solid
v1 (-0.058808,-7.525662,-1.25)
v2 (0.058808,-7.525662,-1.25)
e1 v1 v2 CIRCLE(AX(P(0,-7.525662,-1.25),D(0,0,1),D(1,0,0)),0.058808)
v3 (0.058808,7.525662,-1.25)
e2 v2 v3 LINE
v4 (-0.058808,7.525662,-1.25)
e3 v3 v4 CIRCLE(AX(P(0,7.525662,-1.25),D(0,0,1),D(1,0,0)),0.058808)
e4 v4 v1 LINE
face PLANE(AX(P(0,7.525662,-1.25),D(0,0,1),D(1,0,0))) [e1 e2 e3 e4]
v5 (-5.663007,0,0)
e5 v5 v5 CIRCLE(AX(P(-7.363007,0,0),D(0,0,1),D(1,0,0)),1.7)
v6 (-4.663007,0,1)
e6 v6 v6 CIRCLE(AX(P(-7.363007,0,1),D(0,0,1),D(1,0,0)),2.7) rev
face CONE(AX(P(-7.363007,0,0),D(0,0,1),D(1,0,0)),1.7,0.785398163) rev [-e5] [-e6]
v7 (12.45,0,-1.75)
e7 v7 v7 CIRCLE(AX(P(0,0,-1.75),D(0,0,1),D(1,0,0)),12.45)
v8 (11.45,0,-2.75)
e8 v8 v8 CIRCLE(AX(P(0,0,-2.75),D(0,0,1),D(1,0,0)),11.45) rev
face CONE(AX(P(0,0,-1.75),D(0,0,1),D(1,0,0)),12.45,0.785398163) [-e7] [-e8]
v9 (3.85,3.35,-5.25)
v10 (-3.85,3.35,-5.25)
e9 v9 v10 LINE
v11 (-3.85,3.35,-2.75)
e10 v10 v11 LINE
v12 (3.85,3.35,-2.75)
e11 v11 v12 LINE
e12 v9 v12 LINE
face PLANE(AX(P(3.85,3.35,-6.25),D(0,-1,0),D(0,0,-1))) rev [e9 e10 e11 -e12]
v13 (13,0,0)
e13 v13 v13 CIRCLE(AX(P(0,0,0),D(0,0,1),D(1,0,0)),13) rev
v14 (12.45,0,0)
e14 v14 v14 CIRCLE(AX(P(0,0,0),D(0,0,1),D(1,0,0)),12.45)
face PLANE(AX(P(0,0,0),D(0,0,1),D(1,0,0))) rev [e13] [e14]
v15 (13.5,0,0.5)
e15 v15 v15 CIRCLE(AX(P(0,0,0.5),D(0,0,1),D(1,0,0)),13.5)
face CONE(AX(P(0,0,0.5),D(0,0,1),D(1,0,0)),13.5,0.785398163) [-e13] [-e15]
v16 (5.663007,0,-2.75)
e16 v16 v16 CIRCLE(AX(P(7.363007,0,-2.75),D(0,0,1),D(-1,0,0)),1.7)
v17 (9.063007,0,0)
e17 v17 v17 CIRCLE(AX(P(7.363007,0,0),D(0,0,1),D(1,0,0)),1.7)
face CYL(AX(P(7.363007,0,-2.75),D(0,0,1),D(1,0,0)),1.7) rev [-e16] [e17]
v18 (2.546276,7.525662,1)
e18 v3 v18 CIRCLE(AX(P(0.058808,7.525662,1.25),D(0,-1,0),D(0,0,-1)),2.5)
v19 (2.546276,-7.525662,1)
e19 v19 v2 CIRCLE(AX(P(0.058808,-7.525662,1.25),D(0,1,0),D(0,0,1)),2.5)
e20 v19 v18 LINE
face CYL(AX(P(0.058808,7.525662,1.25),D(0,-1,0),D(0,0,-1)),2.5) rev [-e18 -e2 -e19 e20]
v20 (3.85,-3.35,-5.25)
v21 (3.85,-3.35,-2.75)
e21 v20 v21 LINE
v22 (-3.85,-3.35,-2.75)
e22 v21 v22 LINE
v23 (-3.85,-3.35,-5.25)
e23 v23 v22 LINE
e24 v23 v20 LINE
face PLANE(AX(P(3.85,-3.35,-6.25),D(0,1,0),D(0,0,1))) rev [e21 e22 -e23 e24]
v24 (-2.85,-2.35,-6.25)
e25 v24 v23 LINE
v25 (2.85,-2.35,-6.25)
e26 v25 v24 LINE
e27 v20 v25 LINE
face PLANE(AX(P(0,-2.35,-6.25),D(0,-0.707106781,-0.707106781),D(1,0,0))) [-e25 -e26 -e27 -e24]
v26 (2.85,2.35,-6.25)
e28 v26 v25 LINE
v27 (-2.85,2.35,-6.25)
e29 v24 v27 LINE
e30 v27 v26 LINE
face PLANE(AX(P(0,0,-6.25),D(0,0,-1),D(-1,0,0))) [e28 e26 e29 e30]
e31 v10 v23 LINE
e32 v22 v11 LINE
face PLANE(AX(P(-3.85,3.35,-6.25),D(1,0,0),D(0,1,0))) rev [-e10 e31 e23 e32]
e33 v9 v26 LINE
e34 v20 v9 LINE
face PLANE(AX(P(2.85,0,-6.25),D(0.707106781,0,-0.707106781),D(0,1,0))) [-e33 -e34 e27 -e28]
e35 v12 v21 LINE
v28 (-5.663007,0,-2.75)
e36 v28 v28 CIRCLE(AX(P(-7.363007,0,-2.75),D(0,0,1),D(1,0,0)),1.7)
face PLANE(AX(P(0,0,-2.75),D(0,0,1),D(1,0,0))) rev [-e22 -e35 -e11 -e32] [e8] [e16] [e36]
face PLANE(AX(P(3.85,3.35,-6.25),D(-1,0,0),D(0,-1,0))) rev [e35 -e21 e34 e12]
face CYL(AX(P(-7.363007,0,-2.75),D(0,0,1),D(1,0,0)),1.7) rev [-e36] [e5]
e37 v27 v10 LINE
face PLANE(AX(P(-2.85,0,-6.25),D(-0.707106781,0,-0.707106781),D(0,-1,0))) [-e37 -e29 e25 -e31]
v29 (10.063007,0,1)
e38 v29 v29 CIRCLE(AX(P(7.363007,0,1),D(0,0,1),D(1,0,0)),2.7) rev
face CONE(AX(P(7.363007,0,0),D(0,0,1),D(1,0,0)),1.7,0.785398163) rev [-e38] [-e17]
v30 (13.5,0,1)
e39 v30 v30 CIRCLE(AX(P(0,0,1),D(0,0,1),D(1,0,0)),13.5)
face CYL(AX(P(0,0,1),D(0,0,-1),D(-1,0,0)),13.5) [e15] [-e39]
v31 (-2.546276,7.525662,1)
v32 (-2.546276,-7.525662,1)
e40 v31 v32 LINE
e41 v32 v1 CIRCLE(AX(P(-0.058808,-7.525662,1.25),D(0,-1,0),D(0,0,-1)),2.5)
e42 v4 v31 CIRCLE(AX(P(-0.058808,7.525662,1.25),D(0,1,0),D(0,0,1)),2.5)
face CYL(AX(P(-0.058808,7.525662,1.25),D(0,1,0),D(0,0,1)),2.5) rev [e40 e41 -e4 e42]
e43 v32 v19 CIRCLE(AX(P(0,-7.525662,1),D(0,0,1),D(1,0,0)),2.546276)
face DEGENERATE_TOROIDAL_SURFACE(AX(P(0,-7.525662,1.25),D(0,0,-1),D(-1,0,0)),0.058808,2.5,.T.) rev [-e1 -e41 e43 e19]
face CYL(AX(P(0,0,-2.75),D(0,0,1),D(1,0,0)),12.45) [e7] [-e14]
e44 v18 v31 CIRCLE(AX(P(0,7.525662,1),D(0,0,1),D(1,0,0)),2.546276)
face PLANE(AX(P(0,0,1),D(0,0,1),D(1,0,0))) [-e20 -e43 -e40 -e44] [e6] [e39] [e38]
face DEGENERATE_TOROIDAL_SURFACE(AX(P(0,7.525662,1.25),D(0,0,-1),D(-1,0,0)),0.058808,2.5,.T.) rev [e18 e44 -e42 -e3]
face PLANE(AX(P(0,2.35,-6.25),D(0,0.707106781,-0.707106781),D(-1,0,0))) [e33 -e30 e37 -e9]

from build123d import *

# Parameters (mm, degrees)
SKETCH1_R           = 12.45
SKETCH1_R_2         = 1.7
BOSS_EXTRUDE1_DEPTH = 2.75
SKETCH2_W           = 7.7
SKETCH2_H           = 6.7
BOSS_EXTRUDE2_DEPTH = 3.5
BOSS_EXTRUDE3_START = 1
SKETCH3_R           = 13.5
SKETCH3_R_2         = 1.7
BOSS_EXTRUDE3_DEPTH = 1
CHAMFER1_SIZE       = 1
CHAMFER2_SIZE       = 0.5
CUT_EXTRUDE1_DEPTH  = 2.25
FILLET1_R           = 2.5
CHAMFER3_SIZE       = 1


with BuildPart() as part:
    # Sketch1 → Boss-Extrude1 (new body)
    with BuildSketch(Plane.XY):
        Circle(SKETCH1_R)
        with Locations((-7.36300717, 0)):
            Circle(SKETCH1_R_2, mode=Mode.SUBTRACT)
        with Locations(Location((7.36300717, 0, 0), (0, 0, 180))):
            Circle(SKETCH1_R_2, mode=Mode.SUBTRACT)
    extrude(amount=-BOSS_EXTRUDE1_DEPTH)

    # Sketch2 → Boss-Extrude2 (add)
    with BuildSketch(Plane(origin=(0, 0, -2.75), x_dir=(-1, 0, 0), z_dir=(0, 0, -1))):
        Rectangle(SKETCH2_W, SKETCH2_H)
    extrude(amount=BOSS_EXTRUDE2_DEPTH)

    # Sketch3 → Boss-Extrude3 (add)
    with BuildSketch(Plane.XY.offset(BOSS_EXTRUDE3_START)):
        Circle(SKETCH3_R)
        with Locations((-7.36300717, 0)):
            Circle(SKETCH3_R_2, mode=Mode.SUBTRACT)
        with Locations((7.36300717, 0)):
            Circle(SKETCH3_R_2, mode=Mode.SUBTRACT)
    extrude(amount=-BOSS_EXTRUDE3_DEPTH)

    # Chamfer1
    chamfer1_edges = [part.edges().sort_by_distance(p)[0] for p in [
        (-3.85, 0, -6.25),
        (0, 3.35, -6.25),
        (3.85, 0, -6.25),
        (0, -3.35, -6.25),
        (-12.45, 0, -2.75),
    ]]
    chamfer(chamfer1_edges, length=CHAMFER1_SIZE)

    # Chamfer2
    chamfer2_edges = [part.edges().sort_by_distance(p)[0] for p in [
        (-13.5, 0, 0),
    ]]
    chamfer(chamfer2_edges, length=CHAMFER2_SIZE)

    # Sketch4 → Cut-Extrude1 (cut)
    with BuildSketch(Plane.XY.offset(1)):
        with BuildLine():
            Line((2.54627648, 7.525661596), (2.54627648, -7.525661596))
            ThreePointArc((2.54627648, -7.525661596), (0, -10.071938075), (-2.54627648, -7.525661596))
            Line((-2.54627648, -7.525661596), (-2.54627648, 7.525661596))
            ThreePointArc((-2.54627648, 7.525661596), (0, 10.071938075), (2.54627648, 7.525661596))
        make_face()
    extrude(amount=-CUT_EXTRUDE1_DEPTH, mode=Mode.SUBTRACT)

    # Fillet1
    # the kernel refuses this fillet: 2.5 mm, written as the material it adds along each edge
    with BuildSketch(Plane(origin=(-2.54627648, -7.525661596, -1.25), x_dir=(0, 0, 1), z_dir=(0, 1, 0)), Plane(origin=(2.54627648, 7.525661596, -1.25), x_dir=(0, 0, 1), z_dir=(0, -1, 0))) as fillet1_piece_1:
        with BuildLine():
            CenterArc((2.5, 2.487468593), FILLET1_R, 180, 84.260829523)
            Line((0, 2.487468593), (-0.05, 2.487468593))
            Line((-0.05, 2.487468593), (-0.05, 0))
            Line((-0.05, 0), (0, -0.05))
            ThreePointArc((0, -0.05), (1.125, -0.05), (2.245, -0.049749372))
            Line((2.245, -0.049749372), (2.25, 0))
        make_face()
    extrude(amount=15.051323191)
    with BuildSketch(Plane(origin=(0, 7.525661596, -1.25), x_dir=(-1, 0, 0), z_dir=(0, -1, 0))) as fillet1_piece_2:
        with BuildLine():
            CenterArc((0.058807887, -2.5), FILLET1_R, 5.739170477, 84.260829523)
            Line((0.058807887, 0), (0.058807887, 0.05))
            Line((0.058807887, 0.05), (2.54627648, 0.05))
            Line((2.54627648, 0.05), (2.59627648, 0))
            ThreePointArc((2.59627648, 0), (2.59627648, -1.125), (2.596025852, -2.245))
            Line((2.596025852, -2.245), (2.54627648, -2.25))
        make_face()
    revolve(axis=Axis((0, 7.525661596, -1.25), (0, 0, -1)), revolution_arc=180)
    with BuildSketch(Plane(origin=(0, -7.525661596, -1.25), x_dir=(1, 0, 0), z_dir=(0, 1, 0))) as fillet1_piece_3:
        with BuildLine():
            CenterArc((0.058807887, -2.5), FILLET1_R, 5.739170477, 84.260829523)
            Line((0.058807887, 0), (0.058807887, 0.05))
            Line((0.058807887, 0.05), (2.54627648, 0.05))
            Line((2.54627648, 0.05), (2.59627648, 0))
            ThreePointArc((2.59627648, 0), (2.59627648, -1.125), (2.596025852, -2.245))
            Line((2.596025852, -2.245), (2.54627648, -2.25))
        make_face()
    revolve(axis=Axis((0, -7.525661596, -1.25), (0, 0, -1)), revolution_arc=180)

    # Chamfer3
    # the kernel refuses this chamfer: 1 mm, written as the material it takes off along each edge
    with BuildSketch(Plane(origin=(-7.36300717, 0, 1), x_dir=(1, 0, 0), z_dir=(0, -1, 0))) as chamfer3_piece_1:
        Polygon((1.7 + CHAMFER3_SIZE, 0), (1.7, -CHAMFER3_SIZE), (1.7, 0), align=None)
    revolve(axis=Axis((-7.36300717, 0, 1), (0, 0, 1)), mode=Mode.SUBTRACT)
    with BuildSketch(Plane(origin=(7.36300717, 0, 1), x_dir=(1, 0, 0), z_dir=(0, -1, 0))) as chamfer3_piece_2:
        Polygon((1.7 + CHAMFER3_SIZE, 0), (1.7, -CHAMFER3_SIZE), (1.7, 0), align=None)
    revolve(axis=Axis((7.36300717, 0, 1), (0, 0, 1)), mode=Mode.SUBTRACT)


solid = part.part
